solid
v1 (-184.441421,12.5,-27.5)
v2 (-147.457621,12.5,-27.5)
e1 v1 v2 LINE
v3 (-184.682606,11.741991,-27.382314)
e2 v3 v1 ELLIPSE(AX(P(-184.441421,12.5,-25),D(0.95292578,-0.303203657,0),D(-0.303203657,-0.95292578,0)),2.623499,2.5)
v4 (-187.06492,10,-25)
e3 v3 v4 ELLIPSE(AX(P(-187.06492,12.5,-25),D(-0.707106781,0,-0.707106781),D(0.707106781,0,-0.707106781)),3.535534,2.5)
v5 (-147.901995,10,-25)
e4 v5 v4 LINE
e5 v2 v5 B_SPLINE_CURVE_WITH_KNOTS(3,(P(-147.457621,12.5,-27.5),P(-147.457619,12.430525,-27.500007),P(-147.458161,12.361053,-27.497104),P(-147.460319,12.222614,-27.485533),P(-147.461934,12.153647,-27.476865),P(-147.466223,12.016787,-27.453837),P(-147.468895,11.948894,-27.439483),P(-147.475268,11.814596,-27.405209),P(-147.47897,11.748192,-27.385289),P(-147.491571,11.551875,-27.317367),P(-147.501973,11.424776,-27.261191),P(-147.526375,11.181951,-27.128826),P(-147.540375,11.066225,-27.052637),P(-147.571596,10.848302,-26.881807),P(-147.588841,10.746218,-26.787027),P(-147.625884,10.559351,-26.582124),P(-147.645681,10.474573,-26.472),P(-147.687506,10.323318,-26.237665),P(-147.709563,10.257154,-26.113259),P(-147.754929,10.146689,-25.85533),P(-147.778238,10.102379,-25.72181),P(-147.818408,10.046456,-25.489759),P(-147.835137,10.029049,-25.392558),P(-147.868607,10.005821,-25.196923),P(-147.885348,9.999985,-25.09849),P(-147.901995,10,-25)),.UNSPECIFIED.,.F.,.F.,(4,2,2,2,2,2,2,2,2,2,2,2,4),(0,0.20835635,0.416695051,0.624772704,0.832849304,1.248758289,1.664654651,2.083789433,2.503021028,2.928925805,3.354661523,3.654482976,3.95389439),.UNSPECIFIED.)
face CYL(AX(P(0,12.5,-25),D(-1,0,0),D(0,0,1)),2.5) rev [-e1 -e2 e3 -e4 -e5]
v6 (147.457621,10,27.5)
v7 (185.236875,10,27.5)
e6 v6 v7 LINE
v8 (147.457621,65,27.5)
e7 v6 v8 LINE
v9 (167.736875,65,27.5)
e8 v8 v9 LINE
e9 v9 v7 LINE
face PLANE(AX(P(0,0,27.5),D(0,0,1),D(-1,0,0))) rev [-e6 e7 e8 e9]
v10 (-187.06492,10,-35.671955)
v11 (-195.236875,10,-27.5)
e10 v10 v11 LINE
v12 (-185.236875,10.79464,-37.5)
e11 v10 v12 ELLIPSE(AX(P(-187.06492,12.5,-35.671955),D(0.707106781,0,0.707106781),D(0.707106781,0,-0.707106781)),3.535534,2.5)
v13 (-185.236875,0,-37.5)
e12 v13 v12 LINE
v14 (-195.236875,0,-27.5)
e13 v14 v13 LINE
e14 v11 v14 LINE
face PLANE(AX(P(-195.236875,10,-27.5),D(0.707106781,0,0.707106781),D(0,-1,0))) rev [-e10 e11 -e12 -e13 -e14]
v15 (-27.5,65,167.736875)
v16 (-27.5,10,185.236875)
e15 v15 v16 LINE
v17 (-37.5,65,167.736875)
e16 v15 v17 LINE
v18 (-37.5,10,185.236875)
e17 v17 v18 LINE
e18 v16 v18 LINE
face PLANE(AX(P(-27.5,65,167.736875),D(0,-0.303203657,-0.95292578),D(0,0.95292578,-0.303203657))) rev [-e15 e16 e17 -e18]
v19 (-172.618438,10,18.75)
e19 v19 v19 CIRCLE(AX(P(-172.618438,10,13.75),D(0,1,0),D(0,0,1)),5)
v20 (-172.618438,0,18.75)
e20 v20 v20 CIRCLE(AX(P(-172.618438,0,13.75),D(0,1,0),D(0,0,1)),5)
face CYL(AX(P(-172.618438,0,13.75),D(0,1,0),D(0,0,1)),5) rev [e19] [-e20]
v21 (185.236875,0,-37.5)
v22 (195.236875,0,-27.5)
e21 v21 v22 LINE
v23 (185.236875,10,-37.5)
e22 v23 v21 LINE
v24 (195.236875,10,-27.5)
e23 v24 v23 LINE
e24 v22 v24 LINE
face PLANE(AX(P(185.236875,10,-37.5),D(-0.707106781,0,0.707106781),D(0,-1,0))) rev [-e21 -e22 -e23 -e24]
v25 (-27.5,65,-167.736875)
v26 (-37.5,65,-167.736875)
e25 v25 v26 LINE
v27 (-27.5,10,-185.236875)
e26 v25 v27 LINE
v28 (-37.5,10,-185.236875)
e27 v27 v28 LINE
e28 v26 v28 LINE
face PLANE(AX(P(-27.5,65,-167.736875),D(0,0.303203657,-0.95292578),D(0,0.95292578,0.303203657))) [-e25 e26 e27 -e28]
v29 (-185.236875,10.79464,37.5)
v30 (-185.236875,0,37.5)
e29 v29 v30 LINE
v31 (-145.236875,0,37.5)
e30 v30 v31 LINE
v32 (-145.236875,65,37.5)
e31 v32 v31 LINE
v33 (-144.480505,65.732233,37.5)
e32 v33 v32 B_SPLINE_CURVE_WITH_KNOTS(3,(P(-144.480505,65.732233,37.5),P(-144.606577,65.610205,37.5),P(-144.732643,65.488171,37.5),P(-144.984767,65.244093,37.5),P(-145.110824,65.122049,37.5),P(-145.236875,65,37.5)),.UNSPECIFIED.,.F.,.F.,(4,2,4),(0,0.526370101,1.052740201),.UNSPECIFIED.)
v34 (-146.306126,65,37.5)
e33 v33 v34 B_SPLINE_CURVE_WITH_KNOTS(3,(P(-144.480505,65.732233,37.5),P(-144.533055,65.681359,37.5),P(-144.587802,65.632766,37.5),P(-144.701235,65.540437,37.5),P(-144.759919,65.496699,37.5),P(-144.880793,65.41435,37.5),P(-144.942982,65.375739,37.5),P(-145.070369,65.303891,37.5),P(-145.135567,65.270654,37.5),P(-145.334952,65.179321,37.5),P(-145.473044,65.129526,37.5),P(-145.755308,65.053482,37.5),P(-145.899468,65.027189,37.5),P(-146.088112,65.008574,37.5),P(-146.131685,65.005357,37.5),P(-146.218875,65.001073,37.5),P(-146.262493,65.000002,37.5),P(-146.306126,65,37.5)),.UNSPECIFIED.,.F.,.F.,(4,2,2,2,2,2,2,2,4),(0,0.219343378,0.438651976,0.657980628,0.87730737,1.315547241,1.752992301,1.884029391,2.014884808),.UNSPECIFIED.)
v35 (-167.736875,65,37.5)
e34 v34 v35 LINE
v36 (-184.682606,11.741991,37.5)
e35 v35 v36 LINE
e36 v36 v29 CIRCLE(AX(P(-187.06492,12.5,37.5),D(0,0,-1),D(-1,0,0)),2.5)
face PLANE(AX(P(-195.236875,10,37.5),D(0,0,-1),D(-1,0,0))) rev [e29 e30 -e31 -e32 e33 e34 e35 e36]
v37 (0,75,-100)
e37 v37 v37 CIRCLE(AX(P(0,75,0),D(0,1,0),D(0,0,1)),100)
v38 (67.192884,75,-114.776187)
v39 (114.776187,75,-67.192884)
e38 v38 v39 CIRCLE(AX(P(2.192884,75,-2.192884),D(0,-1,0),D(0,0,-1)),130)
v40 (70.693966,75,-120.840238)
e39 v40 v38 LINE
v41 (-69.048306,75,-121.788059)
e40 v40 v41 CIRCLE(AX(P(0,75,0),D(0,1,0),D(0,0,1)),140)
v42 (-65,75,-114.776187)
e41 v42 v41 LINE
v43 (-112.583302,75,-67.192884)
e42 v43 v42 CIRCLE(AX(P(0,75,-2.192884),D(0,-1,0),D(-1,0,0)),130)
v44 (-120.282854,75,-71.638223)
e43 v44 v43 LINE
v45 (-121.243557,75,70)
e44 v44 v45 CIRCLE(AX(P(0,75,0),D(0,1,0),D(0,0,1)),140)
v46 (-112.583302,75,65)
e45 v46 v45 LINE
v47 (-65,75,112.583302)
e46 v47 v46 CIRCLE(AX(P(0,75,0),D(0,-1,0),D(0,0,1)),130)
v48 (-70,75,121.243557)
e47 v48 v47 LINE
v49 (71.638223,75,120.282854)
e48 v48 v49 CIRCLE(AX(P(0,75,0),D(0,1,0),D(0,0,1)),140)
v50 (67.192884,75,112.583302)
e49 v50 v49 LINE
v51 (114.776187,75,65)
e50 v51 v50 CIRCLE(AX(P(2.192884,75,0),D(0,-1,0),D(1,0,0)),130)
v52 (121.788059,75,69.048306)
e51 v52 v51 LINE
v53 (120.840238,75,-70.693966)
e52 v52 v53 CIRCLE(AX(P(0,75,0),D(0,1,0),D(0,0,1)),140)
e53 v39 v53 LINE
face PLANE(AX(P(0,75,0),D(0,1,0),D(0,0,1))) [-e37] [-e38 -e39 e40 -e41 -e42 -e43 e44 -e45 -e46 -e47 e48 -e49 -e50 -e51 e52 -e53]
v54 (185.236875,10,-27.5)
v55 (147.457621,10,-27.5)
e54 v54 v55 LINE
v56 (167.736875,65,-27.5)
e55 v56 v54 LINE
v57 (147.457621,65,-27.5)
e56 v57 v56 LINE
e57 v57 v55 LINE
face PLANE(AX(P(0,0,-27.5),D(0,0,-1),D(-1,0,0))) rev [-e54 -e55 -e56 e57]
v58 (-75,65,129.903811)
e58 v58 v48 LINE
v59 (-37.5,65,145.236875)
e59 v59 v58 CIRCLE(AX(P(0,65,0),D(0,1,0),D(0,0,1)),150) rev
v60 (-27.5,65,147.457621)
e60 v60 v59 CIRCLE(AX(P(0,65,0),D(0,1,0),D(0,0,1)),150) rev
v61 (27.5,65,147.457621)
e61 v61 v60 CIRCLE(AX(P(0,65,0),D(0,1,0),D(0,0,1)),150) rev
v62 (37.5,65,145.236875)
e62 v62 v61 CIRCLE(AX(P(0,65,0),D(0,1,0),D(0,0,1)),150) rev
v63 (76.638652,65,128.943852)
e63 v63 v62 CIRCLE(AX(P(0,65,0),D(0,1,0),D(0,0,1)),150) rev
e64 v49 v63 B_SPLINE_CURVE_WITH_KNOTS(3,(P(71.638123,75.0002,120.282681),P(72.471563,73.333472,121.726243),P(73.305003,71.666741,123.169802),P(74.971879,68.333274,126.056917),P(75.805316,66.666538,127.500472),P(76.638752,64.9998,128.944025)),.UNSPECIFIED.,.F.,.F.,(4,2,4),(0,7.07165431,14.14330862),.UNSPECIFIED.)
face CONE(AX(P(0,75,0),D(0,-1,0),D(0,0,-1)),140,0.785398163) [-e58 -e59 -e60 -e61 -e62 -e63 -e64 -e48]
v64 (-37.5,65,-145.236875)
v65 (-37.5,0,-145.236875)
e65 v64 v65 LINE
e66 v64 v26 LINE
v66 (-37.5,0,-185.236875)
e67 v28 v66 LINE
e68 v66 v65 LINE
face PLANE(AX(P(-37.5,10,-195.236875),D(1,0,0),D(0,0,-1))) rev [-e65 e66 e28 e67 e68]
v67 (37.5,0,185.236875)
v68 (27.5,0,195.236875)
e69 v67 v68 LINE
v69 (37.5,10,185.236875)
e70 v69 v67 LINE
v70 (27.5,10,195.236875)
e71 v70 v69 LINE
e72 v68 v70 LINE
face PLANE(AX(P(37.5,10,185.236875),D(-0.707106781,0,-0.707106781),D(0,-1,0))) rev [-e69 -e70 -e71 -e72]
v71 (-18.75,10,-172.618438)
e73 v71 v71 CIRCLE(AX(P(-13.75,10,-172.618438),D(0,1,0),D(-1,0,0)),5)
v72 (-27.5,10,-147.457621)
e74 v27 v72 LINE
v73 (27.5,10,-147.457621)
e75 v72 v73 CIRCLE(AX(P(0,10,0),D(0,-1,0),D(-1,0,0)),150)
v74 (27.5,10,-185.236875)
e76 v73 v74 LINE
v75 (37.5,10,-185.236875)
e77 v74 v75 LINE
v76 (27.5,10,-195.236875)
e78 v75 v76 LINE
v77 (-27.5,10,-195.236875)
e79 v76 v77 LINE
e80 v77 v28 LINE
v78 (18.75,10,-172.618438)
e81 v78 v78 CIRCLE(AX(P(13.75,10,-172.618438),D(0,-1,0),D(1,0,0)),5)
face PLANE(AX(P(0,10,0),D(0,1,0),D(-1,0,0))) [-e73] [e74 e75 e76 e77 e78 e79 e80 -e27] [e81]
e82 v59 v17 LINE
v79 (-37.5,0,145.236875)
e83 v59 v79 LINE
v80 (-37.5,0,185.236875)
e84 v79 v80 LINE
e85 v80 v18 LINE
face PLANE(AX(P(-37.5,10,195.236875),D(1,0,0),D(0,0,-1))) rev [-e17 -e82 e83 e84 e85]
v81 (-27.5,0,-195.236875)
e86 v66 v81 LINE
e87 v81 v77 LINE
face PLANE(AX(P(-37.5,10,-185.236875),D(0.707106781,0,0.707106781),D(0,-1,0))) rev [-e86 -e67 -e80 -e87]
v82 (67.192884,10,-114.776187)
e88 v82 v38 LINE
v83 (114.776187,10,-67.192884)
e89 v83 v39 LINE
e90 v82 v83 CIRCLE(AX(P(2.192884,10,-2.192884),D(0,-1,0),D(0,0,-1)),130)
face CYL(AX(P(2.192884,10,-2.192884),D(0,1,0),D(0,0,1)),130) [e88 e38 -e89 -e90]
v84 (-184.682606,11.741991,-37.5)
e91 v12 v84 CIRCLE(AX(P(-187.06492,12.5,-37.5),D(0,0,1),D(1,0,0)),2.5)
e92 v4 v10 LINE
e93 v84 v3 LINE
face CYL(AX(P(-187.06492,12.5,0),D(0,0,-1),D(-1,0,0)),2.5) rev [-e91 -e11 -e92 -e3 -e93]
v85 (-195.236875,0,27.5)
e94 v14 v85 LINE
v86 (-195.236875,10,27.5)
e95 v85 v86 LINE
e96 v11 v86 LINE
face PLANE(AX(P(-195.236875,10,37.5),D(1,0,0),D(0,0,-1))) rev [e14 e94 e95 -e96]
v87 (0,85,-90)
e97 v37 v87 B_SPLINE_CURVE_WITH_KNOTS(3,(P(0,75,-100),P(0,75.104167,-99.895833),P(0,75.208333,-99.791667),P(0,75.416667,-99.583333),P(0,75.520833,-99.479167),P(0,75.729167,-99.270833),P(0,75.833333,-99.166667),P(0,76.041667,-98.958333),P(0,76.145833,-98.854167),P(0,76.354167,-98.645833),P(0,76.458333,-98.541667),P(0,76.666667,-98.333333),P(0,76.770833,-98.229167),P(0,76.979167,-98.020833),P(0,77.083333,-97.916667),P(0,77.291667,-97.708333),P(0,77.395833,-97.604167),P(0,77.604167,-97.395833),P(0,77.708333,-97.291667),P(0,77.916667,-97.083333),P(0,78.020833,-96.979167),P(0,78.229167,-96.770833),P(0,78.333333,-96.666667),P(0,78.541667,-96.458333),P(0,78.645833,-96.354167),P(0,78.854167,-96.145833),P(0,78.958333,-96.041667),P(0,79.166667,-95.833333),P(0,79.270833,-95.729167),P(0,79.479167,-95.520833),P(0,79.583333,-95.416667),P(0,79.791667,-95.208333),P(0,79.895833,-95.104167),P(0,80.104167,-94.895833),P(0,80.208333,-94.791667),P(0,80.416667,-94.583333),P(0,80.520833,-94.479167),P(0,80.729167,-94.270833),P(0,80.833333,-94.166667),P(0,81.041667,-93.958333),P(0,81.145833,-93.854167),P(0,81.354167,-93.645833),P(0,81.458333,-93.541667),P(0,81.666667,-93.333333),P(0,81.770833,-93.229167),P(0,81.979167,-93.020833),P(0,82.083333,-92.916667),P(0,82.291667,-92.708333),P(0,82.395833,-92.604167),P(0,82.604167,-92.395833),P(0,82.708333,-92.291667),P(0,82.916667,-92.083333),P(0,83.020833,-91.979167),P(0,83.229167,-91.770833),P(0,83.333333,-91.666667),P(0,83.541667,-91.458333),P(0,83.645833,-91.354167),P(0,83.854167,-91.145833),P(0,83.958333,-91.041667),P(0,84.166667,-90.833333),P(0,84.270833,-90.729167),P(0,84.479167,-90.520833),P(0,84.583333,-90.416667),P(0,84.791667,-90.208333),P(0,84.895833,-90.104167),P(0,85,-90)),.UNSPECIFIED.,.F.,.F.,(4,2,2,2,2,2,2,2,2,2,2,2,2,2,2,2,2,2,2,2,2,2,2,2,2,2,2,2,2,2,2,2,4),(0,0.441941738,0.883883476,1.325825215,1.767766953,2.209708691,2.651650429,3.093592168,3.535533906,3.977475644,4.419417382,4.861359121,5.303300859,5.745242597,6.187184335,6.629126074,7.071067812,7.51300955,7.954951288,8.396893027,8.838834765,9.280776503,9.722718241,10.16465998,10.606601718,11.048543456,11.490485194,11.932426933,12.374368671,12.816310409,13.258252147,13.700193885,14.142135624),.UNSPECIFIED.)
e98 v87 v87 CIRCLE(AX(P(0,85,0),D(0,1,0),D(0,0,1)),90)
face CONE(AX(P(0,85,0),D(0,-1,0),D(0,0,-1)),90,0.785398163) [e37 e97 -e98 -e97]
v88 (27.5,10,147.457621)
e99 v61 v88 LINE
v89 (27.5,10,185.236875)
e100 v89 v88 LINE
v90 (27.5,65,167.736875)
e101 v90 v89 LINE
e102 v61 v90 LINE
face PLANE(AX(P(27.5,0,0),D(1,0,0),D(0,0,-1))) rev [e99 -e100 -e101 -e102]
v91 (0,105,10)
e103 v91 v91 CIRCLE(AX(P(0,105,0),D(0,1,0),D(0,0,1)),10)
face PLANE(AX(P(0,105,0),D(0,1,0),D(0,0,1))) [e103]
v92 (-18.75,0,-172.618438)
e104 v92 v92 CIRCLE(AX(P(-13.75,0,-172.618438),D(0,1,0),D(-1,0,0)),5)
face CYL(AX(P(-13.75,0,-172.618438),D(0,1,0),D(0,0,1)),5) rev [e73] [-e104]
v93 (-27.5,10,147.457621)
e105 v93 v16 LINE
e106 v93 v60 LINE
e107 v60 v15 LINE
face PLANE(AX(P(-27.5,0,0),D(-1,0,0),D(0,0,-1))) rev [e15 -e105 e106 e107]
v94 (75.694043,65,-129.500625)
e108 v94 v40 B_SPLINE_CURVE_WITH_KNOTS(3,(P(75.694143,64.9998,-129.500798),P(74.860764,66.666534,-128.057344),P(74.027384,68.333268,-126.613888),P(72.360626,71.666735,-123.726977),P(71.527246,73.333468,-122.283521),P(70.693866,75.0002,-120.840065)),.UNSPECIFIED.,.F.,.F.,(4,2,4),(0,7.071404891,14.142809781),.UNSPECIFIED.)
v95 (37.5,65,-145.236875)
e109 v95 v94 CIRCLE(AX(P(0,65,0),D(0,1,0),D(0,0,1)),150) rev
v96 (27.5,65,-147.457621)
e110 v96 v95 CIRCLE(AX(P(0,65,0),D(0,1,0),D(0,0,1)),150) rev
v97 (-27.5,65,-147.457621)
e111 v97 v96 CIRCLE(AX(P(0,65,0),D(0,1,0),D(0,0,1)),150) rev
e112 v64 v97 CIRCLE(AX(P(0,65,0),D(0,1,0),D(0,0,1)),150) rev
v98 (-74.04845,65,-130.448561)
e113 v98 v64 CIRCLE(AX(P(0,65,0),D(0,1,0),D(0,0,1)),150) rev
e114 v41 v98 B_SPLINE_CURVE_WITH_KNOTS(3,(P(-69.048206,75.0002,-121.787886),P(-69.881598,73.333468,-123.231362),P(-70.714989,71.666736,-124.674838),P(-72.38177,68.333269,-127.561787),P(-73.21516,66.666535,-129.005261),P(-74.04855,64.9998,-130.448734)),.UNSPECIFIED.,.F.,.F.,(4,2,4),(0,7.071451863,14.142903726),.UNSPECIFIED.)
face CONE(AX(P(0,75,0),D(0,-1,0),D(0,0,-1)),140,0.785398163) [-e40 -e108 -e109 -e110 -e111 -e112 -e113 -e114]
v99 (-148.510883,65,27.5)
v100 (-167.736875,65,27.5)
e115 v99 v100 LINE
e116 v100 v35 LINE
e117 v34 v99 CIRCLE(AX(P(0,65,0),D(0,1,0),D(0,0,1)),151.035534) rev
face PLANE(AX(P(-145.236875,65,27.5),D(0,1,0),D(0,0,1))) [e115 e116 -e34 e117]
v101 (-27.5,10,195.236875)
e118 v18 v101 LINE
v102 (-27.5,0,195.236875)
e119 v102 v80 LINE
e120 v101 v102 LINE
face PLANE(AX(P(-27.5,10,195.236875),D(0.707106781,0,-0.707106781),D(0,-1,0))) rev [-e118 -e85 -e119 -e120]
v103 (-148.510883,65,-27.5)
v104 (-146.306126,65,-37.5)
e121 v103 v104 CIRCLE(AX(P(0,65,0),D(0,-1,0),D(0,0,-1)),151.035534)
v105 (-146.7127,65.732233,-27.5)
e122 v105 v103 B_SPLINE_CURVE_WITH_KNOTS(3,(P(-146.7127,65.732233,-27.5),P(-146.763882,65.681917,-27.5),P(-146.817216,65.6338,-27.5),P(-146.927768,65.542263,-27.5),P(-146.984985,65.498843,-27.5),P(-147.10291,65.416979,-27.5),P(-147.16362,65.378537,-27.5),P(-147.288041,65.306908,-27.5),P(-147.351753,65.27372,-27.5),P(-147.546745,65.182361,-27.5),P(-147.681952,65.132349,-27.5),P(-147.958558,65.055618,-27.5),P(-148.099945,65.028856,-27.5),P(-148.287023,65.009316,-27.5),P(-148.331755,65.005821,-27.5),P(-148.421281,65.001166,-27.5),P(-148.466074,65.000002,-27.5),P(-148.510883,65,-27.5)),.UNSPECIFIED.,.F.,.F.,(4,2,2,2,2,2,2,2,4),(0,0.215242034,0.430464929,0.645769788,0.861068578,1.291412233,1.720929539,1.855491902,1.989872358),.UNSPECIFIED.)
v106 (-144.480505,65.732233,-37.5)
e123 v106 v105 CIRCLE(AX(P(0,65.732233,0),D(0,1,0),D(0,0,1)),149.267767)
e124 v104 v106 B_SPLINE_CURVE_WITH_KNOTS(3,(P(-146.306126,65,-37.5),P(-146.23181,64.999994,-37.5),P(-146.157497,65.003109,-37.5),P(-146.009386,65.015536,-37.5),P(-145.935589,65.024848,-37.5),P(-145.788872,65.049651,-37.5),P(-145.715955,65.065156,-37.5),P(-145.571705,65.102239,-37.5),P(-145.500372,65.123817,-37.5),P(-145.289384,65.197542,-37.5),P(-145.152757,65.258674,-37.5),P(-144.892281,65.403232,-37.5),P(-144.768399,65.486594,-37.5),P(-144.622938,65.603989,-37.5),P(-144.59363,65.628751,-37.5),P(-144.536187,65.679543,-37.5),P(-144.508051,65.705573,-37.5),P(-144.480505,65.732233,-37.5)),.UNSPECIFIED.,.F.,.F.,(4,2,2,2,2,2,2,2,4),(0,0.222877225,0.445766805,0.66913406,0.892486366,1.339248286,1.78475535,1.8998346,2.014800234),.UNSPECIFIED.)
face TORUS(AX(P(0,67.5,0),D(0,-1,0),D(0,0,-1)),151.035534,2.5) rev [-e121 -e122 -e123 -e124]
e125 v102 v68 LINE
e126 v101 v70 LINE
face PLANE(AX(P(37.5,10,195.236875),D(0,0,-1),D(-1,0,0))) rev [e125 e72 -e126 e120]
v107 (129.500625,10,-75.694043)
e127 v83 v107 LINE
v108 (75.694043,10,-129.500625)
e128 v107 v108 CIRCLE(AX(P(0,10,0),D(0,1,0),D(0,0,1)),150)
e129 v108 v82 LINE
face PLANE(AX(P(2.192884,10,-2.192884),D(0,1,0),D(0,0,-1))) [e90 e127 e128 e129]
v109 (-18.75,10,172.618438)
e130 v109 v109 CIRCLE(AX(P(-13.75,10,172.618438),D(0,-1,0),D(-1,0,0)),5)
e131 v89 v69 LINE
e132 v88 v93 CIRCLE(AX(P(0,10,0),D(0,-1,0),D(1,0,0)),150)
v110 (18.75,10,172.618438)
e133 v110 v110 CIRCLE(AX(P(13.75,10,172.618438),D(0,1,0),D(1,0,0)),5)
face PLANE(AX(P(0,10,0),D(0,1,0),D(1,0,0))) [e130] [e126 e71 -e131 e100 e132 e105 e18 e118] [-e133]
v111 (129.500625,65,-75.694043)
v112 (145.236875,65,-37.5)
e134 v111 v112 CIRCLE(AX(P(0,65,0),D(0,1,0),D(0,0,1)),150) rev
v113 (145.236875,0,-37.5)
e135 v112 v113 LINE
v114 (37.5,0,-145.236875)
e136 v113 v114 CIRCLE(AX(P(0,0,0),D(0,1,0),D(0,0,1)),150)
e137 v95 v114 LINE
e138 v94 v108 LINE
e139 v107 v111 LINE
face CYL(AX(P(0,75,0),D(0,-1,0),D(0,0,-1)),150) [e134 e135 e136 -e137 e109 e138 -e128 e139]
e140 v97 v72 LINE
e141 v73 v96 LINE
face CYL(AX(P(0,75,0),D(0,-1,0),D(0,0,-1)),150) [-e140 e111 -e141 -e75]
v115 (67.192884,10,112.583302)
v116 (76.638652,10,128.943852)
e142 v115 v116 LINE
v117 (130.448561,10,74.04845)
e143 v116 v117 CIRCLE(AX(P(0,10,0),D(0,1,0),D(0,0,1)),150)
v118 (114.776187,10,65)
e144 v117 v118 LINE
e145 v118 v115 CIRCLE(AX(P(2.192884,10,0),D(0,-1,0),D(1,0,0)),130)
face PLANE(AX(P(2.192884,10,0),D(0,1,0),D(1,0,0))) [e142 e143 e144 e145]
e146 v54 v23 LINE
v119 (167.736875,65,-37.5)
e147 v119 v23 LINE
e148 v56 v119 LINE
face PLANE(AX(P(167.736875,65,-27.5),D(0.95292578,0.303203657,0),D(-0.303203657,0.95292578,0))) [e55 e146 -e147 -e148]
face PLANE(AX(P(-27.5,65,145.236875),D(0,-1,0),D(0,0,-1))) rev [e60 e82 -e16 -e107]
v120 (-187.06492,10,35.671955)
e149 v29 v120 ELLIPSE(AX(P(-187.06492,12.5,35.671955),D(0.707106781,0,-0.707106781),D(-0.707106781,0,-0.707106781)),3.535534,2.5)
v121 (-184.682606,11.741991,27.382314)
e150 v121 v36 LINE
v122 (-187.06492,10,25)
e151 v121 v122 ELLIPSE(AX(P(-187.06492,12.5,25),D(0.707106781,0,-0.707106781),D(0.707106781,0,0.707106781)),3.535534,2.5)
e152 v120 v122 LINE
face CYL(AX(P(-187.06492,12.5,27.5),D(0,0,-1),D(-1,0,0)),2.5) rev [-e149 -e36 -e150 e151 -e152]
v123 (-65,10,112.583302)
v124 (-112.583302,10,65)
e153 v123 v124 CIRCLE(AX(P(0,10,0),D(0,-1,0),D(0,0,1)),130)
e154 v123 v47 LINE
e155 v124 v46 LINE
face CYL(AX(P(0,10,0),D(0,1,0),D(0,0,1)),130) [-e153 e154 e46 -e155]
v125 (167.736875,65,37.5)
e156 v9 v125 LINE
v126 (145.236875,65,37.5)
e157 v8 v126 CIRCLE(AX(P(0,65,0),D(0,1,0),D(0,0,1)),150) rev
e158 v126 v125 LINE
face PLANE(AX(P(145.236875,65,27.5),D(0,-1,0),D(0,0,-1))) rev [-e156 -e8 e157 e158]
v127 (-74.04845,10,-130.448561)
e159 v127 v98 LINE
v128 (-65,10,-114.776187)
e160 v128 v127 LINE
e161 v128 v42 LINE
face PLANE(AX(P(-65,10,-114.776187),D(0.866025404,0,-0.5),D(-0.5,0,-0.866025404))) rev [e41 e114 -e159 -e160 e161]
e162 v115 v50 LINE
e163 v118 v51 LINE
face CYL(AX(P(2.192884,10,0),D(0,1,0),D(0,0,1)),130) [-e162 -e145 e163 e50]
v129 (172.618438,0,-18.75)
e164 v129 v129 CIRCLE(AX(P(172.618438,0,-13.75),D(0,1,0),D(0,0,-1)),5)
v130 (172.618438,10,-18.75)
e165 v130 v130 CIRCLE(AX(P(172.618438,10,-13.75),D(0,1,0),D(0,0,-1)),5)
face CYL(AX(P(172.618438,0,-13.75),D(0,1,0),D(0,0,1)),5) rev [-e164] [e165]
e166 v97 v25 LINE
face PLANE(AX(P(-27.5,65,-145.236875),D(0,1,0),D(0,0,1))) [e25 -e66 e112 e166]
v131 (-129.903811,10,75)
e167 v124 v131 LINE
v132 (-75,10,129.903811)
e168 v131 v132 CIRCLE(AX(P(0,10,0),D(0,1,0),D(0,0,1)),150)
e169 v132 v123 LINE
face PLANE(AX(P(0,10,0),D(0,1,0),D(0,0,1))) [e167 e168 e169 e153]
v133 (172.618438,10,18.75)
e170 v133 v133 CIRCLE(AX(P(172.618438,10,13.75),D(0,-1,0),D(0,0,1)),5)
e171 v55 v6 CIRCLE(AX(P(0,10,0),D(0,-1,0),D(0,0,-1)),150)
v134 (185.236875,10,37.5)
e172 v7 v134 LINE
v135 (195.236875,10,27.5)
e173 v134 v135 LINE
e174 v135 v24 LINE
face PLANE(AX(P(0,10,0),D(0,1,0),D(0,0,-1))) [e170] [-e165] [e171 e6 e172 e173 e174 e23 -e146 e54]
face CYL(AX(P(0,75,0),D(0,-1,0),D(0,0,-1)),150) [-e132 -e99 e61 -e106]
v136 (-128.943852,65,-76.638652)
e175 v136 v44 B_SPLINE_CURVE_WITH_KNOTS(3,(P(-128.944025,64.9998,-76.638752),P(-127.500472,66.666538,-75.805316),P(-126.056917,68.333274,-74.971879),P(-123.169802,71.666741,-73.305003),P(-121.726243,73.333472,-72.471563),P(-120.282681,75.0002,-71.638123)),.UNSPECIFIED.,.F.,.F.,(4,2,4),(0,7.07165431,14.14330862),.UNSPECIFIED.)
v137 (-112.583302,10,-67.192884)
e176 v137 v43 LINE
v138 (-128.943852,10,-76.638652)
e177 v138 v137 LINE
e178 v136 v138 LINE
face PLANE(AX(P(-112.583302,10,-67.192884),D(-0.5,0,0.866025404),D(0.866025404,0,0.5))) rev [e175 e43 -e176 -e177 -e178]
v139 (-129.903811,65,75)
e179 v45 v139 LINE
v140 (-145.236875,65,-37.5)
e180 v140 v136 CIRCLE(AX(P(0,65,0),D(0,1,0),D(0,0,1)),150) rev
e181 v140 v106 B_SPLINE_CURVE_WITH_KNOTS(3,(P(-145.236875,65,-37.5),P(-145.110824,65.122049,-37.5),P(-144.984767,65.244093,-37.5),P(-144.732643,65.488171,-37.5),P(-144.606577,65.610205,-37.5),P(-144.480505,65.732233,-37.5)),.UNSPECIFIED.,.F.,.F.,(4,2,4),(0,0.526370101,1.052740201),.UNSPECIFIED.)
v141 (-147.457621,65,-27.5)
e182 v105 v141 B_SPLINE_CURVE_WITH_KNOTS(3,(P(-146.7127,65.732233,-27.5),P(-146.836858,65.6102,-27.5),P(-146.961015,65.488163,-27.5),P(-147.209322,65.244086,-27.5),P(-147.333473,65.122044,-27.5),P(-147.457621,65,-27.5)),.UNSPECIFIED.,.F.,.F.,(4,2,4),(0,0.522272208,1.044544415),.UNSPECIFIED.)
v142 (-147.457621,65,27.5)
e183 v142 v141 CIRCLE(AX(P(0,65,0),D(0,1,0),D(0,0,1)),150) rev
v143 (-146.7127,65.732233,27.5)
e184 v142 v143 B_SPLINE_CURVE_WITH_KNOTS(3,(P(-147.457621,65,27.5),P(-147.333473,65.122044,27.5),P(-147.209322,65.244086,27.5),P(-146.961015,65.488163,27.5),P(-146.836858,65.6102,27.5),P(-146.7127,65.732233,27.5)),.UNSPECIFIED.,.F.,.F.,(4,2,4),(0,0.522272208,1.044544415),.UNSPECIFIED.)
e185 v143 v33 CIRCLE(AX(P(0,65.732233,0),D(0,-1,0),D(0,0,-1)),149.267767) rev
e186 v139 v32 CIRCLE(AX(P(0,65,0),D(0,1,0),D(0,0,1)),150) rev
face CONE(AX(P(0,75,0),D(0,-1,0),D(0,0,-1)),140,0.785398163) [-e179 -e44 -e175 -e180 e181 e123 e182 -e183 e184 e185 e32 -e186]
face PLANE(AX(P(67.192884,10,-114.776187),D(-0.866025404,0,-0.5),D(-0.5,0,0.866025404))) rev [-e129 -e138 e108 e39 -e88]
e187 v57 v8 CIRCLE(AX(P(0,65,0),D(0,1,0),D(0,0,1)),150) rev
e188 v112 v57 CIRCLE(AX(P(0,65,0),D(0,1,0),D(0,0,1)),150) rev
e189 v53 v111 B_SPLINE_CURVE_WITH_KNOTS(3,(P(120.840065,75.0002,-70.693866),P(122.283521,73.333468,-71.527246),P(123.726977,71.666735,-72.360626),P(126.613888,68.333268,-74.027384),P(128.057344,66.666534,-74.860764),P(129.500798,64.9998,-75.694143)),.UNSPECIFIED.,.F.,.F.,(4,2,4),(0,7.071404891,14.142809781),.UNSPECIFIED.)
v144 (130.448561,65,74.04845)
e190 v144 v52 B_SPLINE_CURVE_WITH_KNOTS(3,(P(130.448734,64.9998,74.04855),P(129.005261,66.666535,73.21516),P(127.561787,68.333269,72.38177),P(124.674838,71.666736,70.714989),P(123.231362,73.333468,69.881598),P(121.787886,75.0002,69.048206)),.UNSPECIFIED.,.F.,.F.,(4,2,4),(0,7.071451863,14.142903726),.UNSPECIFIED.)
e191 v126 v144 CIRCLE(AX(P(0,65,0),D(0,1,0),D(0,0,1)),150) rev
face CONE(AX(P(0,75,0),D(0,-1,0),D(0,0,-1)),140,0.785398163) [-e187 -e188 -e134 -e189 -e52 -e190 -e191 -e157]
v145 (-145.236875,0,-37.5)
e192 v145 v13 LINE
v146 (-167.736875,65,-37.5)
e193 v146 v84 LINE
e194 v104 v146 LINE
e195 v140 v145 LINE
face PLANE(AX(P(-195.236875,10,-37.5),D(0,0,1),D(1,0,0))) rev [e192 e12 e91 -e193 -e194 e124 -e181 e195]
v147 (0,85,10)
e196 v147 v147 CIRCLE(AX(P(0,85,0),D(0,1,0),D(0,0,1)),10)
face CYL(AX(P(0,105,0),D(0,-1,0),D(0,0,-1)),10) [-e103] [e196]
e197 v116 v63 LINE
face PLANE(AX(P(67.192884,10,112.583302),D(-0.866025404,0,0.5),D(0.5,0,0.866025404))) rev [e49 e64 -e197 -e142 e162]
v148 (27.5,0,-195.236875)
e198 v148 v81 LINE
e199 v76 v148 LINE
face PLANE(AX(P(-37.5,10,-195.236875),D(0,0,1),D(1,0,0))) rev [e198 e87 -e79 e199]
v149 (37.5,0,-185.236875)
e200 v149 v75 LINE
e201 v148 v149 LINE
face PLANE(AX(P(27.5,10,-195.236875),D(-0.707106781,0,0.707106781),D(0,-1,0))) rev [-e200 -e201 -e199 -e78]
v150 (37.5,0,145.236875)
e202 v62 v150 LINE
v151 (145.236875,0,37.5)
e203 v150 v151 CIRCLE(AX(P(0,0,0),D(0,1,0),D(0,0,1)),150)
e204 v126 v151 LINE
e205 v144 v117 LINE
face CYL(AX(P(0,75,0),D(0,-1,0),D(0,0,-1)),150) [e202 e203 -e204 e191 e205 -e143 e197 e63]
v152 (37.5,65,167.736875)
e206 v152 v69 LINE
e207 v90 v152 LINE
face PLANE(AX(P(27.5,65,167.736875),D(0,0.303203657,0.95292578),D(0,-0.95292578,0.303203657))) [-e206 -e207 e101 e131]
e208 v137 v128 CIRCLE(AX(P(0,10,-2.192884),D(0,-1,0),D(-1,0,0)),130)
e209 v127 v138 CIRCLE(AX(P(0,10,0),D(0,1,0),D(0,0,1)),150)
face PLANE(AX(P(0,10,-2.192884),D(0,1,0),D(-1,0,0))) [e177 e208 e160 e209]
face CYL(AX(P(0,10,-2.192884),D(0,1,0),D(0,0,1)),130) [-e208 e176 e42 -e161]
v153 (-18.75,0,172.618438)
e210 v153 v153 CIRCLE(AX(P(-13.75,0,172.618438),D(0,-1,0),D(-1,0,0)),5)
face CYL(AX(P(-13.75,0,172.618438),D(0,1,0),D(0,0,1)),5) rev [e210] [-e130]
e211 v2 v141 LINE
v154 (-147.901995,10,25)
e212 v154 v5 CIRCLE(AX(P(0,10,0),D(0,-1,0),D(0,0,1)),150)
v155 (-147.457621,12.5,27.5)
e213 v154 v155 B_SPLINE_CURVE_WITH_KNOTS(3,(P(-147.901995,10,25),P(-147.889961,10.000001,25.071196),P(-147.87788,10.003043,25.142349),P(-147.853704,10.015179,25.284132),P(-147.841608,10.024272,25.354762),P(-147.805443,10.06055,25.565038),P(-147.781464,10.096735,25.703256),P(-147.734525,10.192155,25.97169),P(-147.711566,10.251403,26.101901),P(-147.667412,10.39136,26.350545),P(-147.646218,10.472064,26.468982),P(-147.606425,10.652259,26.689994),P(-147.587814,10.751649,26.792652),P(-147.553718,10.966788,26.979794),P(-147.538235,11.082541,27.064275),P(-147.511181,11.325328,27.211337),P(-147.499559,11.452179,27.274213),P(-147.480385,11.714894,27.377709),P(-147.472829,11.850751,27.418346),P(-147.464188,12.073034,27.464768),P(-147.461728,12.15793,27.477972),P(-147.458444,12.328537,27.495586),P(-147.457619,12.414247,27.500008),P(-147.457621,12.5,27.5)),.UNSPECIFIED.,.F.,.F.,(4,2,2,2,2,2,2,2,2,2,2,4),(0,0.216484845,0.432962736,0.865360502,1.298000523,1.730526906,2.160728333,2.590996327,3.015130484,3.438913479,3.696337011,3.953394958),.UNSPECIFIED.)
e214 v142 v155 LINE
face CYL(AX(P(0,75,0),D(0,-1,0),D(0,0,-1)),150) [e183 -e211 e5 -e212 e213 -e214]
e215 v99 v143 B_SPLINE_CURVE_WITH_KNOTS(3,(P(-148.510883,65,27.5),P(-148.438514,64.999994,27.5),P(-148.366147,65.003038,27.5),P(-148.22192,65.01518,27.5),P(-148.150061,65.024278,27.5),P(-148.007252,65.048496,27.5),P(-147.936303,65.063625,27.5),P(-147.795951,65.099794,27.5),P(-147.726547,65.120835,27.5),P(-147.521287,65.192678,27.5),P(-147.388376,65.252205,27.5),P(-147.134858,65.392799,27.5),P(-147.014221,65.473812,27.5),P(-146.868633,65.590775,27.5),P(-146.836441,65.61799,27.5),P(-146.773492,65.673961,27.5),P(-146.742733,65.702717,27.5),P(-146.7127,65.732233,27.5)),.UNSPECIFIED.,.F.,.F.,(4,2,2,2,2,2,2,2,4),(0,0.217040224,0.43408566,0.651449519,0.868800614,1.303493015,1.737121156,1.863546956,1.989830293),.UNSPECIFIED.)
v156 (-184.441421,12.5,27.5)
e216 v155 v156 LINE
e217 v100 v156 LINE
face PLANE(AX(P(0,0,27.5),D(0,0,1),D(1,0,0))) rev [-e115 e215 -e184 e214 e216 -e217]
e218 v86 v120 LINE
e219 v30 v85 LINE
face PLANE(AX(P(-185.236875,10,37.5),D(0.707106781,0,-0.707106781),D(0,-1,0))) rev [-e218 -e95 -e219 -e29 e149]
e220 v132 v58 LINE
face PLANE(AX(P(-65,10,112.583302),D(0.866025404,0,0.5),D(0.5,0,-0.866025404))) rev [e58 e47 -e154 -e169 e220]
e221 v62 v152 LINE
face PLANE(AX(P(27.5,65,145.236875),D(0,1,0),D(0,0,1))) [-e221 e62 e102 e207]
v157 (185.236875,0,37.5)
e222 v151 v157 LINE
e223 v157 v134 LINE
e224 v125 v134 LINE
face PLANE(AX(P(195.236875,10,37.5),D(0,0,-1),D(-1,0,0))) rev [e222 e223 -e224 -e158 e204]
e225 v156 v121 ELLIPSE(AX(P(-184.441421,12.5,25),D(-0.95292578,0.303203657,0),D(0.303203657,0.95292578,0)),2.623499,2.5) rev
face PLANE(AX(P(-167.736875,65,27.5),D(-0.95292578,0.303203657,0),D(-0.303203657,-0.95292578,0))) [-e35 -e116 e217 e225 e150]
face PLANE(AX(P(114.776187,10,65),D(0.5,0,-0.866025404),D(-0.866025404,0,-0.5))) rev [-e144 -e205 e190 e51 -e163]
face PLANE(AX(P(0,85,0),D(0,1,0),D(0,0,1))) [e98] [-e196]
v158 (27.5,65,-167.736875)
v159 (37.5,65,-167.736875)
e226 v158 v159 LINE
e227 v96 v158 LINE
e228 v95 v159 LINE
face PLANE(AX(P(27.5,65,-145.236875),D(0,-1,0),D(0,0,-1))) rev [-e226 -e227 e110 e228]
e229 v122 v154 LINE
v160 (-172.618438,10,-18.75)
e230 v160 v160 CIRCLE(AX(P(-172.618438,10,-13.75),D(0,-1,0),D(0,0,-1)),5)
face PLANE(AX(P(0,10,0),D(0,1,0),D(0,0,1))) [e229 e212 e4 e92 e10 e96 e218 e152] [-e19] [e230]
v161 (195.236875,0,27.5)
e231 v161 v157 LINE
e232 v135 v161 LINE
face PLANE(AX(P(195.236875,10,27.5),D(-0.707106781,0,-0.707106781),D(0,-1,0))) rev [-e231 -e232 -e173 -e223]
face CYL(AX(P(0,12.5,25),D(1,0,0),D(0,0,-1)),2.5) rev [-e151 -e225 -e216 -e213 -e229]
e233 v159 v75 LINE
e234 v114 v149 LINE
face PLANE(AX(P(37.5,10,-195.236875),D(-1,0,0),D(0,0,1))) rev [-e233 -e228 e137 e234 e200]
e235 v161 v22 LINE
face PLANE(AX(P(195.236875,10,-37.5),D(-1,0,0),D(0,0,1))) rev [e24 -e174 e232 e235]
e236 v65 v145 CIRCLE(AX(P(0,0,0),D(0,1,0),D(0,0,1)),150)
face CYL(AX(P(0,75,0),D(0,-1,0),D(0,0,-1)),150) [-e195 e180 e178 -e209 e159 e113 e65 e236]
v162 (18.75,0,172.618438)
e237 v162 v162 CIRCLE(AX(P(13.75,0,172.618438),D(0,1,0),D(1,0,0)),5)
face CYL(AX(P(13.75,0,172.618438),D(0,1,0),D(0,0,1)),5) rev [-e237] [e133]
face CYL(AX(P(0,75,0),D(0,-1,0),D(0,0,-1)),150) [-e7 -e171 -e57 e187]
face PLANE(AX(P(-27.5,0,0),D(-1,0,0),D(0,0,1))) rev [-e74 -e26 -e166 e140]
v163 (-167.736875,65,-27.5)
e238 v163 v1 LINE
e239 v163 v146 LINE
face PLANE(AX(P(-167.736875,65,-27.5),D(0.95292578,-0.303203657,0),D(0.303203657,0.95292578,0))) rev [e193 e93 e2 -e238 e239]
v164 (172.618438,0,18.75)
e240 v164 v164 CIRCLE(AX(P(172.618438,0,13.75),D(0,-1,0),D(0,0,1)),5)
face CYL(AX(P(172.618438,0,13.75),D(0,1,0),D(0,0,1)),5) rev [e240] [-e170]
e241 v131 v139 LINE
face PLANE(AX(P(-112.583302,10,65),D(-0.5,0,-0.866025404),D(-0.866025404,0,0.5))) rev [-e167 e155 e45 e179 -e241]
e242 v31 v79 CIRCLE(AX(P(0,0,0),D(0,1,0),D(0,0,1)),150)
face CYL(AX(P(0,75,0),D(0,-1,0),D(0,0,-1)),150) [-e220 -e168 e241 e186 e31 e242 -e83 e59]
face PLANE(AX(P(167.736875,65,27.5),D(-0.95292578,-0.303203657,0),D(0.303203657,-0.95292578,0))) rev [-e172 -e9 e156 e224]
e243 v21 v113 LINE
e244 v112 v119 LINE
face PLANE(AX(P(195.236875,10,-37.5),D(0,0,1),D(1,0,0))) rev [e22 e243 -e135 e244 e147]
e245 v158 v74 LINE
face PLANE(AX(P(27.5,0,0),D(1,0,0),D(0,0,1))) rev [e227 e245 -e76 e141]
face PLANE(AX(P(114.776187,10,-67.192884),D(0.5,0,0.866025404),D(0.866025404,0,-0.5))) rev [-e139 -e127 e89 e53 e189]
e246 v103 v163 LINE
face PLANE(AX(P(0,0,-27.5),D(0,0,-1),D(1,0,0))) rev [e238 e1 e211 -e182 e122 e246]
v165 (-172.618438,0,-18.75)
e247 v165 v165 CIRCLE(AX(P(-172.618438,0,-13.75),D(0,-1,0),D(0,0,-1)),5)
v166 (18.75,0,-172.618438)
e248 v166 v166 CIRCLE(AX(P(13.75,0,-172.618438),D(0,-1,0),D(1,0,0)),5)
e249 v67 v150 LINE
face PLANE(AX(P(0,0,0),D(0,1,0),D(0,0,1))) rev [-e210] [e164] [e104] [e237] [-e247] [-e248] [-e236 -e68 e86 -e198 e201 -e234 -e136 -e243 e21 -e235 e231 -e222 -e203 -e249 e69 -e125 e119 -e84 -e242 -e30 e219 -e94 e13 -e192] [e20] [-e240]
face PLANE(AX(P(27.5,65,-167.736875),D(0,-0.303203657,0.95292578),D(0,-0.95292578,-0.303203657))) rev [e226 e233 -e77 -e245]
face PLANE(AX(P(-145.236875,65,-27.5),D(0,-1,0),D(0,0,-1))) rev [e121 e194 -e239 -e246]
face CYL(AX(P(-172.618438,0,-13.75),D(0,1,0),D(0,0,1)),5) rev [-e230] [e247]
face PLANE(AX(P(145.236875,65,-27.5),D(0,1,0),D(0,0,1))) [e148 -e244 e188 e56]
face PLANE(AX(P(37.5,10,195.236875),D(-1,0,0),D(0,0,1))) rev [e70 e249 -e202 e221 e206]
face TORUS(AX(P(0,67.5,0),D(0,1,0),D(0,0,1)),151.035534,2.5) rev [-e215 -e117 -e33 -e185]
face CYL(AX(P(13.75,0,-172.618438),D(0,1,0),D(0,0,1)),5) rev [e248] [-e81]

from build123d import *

# Parameters (mm, degrees)
SKETCH1_R                    = 150
BOSS_EXTRUDE1_DEPTH          = 75
CHAMFER1_SIZE                = 10
BOSS_EXTRUDE2_START          = -75
BOSS_EXTRUDE2_DEPTH          = 10
CHAMFER2_SIZE                = 10
BOSS_EXTRUDE3_DEPTH          = 10
SKETCH4_R                    = 5
CUT_EXTRUDE1_DEPTH           = 10
FILLET1_R                    = 2.5
FILLET2_R                    = 2.5
FILLET3_R                    = 2.5
CIRPATTERN4_COUNT            = 4
CIRPATTERN4_COPY_1_DEPTH     = 10
CIRPATTERN4_COPY_2_DEPTH     = 10
CIRPATTERN4_COPY_3_DEPTH     = 10
CIRPATTERN4_COPY_4_SKETCH_R  = 5
CIRPATTERN4_COPY_4_DEPTH     = 10
CIRPATTERN4_COPY_5_SKETCH_R  = 5
CIRPATTERN4_COPY_5_DEPTH     = 10
CIRPATTERN4_COPY_6_SKETCH_R  = 5
CIRPATTERN4_COPY_6_DEPTH     = 10
CHAMFER2_OF_CIRPATTERN4_SIZE = 10
CUT_EXTRUDE2_START           = -65
CUT_EXTRUDE2_DEPTH           = 65
CIRPATTERN5_COUNT            = 4
SKETCH6_R                    = 100
BOSS_EXTRUDE4_DEPTH          = 10
CHAMFER3_SIZE                = 10
SKETCH7_R                    = 10
BOSS_EXTRUDE5_DEPTH          = 20


# Some blends are built 0.0001 mm under size
with BuildPart() as part:
    # Sketch1 → Boss-Extrude1 (new body)
    with BuildSketch(Plane(origin=(0, 0, 0), x_dir=(1, 0, 0), z_dir=(0, 1, 0))):
        with Locations(Location((0, 0, 0), (0, 0, 270))):
            Circle(SKETCH1_R)
    extrude(amount=BOSS_EXTRUDE1_DEPTH)

    # Chamfer1
    chamfer1_edges = [part.edges().sort_by_distance(p)[0] for p in [
        (0, 75, -150),
    ]]
    chamfer(chamfer1_edges, length=CHAMFER1_SIZE)

    # Sketch2 → Boss-Extrude2 (add)
    with BuildSketch(Plane(origin=(0, 75, 0), x_dir=(1, 0, 0), z_dir=(0, 1, 0)).offset(BOSS_EXTRUDE2_START)):
        with BuildLine():
            Line((-195.236875483, -37.5), (-195.236875483, 37.5))
            Line((-195.236875483, 37.5), (-145.236875483, 37.5))
            ThreePointArc((-145.236875483, 37.5), (-150, 0), (-145.236875483, -37.5))
            Line((-145.236875483, -37.5), (-195.236875483, -37.5))
        make_face()
    boss_extrude2 = extrude(amount=BOSS_EXTRUDE2_DEPTH)

    # Chamfer2
    chamfer2_edges = [part.edges().sort_by_distance(p)[0] for p in [
        (-195.236875483, 5, -37.5),
        (-195.236875483, 5, 37.5),
    ]]
    chamfer(chamfer2_edges, length=CHAMFER2_SIZE)

    # Sketch3 → Boss-Extrude3 (add)
    with BuildSketch(Plane.XY.offset(37.5)):
        Polygon((-145.236875483, 0), (-145.236875483, 65), (-167.736875483, 65), (-185.236875483, 10), (-185.236875483, 0), align=None)
    boss_extrude3 = extrude(amount=-BOSS_EXTRUDE3_DEPTH)

    # Sketch4 → Cut-Extrude1 (cut)
    with BuildSketch(Plane(origin=(0, 10, 0), x_dir=(1, 0, 0), z_dir=(0, 1, 0))):
        with Locations(Location((-172.618437741, -13.75, 0), (0, 0, 270))):
            Circle(SKETCH4_R)
    cut_extrude1 = extrude(amount=-CUT_EXTRUDE1_DEPTH, mode=Mode.SUBTRACT)

    # Mirror2: Boss-Extrude3, Cut-Extrude1 across plane
    add(boss_extrude3.mirror(Plane(origin=(0, 0, 0), x_dir=(1, 0, 0), z_dir=(0, 0, -1))))
    add(cut_extrude1.mirror(Plane(origin=(0, 0, 0), x_dir=(1, 0, 0), z_dir=(0, 0, -1))), mode=Mode.SUBTRACT)

    # Fillet1
    fillet1_edges = [part.edges().sort_by_distance(p)[0] for p in [
        (-166.347248257, 10, -27.5),
        (-185.236875483, 10, -32.5),
    ]]
    fillet(fillet1_edges, radius=FILLET1_R)

    # Fillet2
    fillet2_edges = [part.edges().sort_by_distance(p)[0] for p in [
        (-166.347248257, 10, 27.5),
        (-185.236875483, 10, 32.5),
    ]]
    fillet(fillet2_edges, radius=FILLET2_R)

    # Fillet3
    # the kernel refuses this fillet: 2.5 mm, written as the material it adds along each edge
    with BuildSketch(Plane(origin=(0, 65, 0), x_dir=(-0.9860683765202287, 0, 0.1663404846294499), z_dir=(-0.1663404846294499, 0, -0.9860683765202287))) as fillet3_piece_1_section:
        with BuildLine():
            CenterArc((150 + FILLET3_R * 0.414213562373, FILLET3_R), FILLET3_R, 225, 45)
            Line((150 + FILLET3_R * 0.414213562373, 0), (150, 0))
            Line((150, 0), (150 - FILLET3_R * 0.292893218813, FILLET3_R * 0.292893218813))
        make_face()
    fillet3_piece_1 = revolve(axis=Axis((0, 65, 0), (0, 1, 0)), revolution_arc=5.891260177, mode=Mode.PRIVATE)
    fillet3_piece_1 = split(fillet3_piece_1, bisect_by=Plane(origin=(-146.208853891, 65.259294833, 27.5), z_dir=(0, 0, 1)), keep=Keep.TOP, mode=Mode.PRIVATE)
    fillet3_piece_1 = split(fillet3_piece_1, bisect_by=Plane(origin=(-146.208853891, 65.259294833, 37.5), z_dir=(0, 0, -1)), keep=Keep.TOP, mode=Mode.PRIVATE)
    add(fillet3_piece_1)
    with BuildSketch(Plane(origin=(0, 65, 0), x_dir=(-0.9637871207414556, 0, -0.2666728068118214), z_dir=(0.2666728068118214, 0, -0.9637871207414556))) as fillet3_piece_2_section:
        with BuildLine():
            CenterArc((150 + FILLET3_R * 0.414213562373, FILLET3_R), FILLET3_R, 225, 45)
            Line((150 + FILLET3_R * 0.414213562373, 0), (150, 0))
            Line((150, 0), (150 - FILLET3_R * 0.292893218813, FILLET3_R * 0.292893218813))
        make_face()
    fillet3_piece_2 = revolve(axis=Axis((0, 65, 0), (0, 1, 0)), revolution_arc=5.891260177, mode=Mode.PRIVATE)
    fillet3_piece_2 = split(fillet3_piece_2, bisect_by=Plane(origin=(-146.20885389, 65.259294833, -27.5), z_dir=(0, 0, -1)), keep=Keep.TOP, mode=Mode.PRIVATE)
    fillet3_piece_2 = split(fillet3_piece_2, bisect_by=Plane(origin=(-146.20885389, 65.259294833, -37.5), z_dir=(0, 0, 1)), keep=Keep.TOP, mode=Mode.PRIVATE)
    add(fillet3_piece_2)

    # CirPattern4: Boss-Extrude2, Boss-Extrude3, Cut-Extrude1 ×4 about axis
    cirpattern4_axis = Axis((0, 0, 0), (0, 1, 0))
    add([boss_extrude2.rotate(cirpattern4_axis, i * 360 / CIRPATTERN4_COUNT) for i in range(1, CIRPATTERN4_COUNT)])
    add([boss_extrude3.rotate(cirpattern4_axis, i * 360 / CIRPATTERN4_COUNT) for i in range(1, CIRPATTERN4_COUNT)])
    add([cut_extrude1.rotate(cirpattern4_axis, i * 360 / CIRPATTERN4_COUNT) for i in range(1, CIRPATTERN4_COUNT)], mode=Mode.SUBTRACT)

    # CirPattern4 copy 1 sketch → CirPattern4 copy 1 (add)
    with BuildSketch(Plane(origin=(-37.5, 0, 0), x_dir=(0, 0, -1), z_dir=(-1, 0, 0))):
        Polygon((-145.236875483, 0), (-145.236875483, -65), (-167.736875483, -65), (-185.236875483, -10), (-185.236875483, 0), align=None)
    extrude(amount=-CIRPATTERN4_COPY_1_DEPTH)

    # CirPattern4 copy 2 sketch → CirPattern4 copy 2 (add)
    with BuildSketch(Plane(origin=(0, 0, 37.5), x_dir=(-1, 0, 0), z_dir=(0, 0, 1))):
        Polygon((-145.236875483, 0), (-145.236875483, -65), (-167.736875483, -65), (-185.236875483, -10), (-185.236875483, 0), align=None)
    extrude(amount=-CIRPATTERN4_COPY_2_DEPTH)

    # CirPattern4 copy 3 sketch → CirPattern4 copy 3 (add)
    with BuildSketch(Plane(origin=(37.5, 0, 0), x_dir=(0, 0, 1), z_dir=(1, 0, 0))):
        Polygon((-145.236875483, 0), (-145.236875483, -65), (-167.736875483, -65), (-185.236875483, -10), (-185.236875483, 0), align=None)
    extrude(amount=-CIRPATTERN4_COPY_3_DEPTH)

    # CirPattern4 copy 4 sketch → CirPattern4 copy 4 (cut)
    with BuildSketch(Plane(origin=(0, 10, 0), x_dir=(0, 0, -1), z_dir=(0, 1, 0))):
        with Locations((-172.618437741, 13.75)):
            Circle(CIRPATTERN4_COPY_4_SKETCH_R)
    extrude(amount=-CIRPATTERN4_COPY_4_DEPTH, mode=Mode.SUBTRACT)

    # CirPattern4 copy 5 sketch → CirPattern4 copy 5 (cut)
    with BuildSketch(Plane(origin=(0, 10, 0), x_dir=(-1, 0, 0), z_dir=(0, 1, 0))):
        with Locations((-172.618437741, 13.75)):
            Circle(CIRPATTERN4_COPY_5_SKETCH_R)
    extrude(amount=-CIRPATTERN4_COPY_5_DEPTH, mode=Mode.SUBTRACT)

    # CirPattern4 copy 6 sketch → CirPattern4 copy 6 (cut)
    with BuildSketch(Plane.ZX.offset(10)):
        with Locations((-172.618437741, 13.75)):
            Circle(CIRPATTERN4_COPY_6_SKETCH_R)
    extrude(amount=-CIRPATTERN4_COPY_6_DEPTH, mode=Mode.SUBTRACT)

    # Chamfer2 of CirPattern4
    chamfer2_of_cirpattern4_edges = [part.edges().sort_by_distance(p)[0] for p in [
        (-37.5, 5, 195.236875483),
        (37.5, 5, 195.236875483),
        (195.236875483, 5, 37.5),
        (195.236875483, 5, -37.5),
        (37.5, 5, -195.236875483),
        (-37.5, 5, -195.236875483),
    ]]
    chamfer(chamfer2_of_cirpattern4_edges, length=CHAMFER2_OF_CIRPATTERN4_SIZE)

    # Sketch5 → Cut-Extrude2 (cut)
    with BuildSketch(Plane(origin=(0, 75, 0), x_dir=(1, 0, 0), z_dir=(0, 1, 0)).offset(CUT_EXTRUDE2_START)):
        with BuildLine():
            Line((-112.583302492, -65), (-129.903810568, -75))
            ThreePointArc((-129.903810568, -75), (-106.066017178, -106.066017178), (-75, -129.903810568))
            Line((-75, -129.903810568), (-65, -112.583302492))
            ThreePointArc((-65, -112.583302492), (-91.923881554, -91.923881554), (-112.583302492, -65))
        make_face()
    cut_extrude2 = extrude(amount=CUT_EXTRUDE2_DEPTH, mode=Mode.SUBTRACT)

    # CirPattern5: Cut-Extrude2 ×4 about axis
    cirpattern5_axis = Axis((1.096442134, 0, -1.096442134), (0, 1, 0))
    for i in range(1, CIRPATTERN5_COUNT):
        add(cut_extrude2.rotate(cirpattern5_axis, i * 360 / CIRPATTERN5_COUNT), mode=Mode.SUBTRACT)

    # Sketch6 → Boss-Extrude4 (add)
    with BuildSketch(Plane(origin=(0, 75, 0), x_dir=(1, 0, 0), z_dir=(0, 1, 0))):
        with Locations(Location((0, 0, 0), (0, 0, 270))):
            Circle(SKETCH6_R)
    extrude(amount=BOSS_EXTRUDE4_DEPTH)

    # Chamfer3
    chamfer3_edges = [part.edges().sort_by_distance(p)[0] for p in [
        (0, 85, -100),
    ]]
    chamfer(chamfer3_edges, length=CHAMFER3_SIZE - 0.0001)  # a hair under: the kernel refuses the full size

    # Sketch7 → Boss-Extrude5 (add)
    with BuildSketch(Plane(origin=(0, 85, 0), x_dir=(1, 0, 0), z_dir=(0, 1, 0))):
        with Locations(Location((0, 0, 0), (0, 0, 270))):
            Circle(SKETCH7_R)
    extrude(amount=BOSS_EXTRUDE5_DEPTH)


solid = part.part
